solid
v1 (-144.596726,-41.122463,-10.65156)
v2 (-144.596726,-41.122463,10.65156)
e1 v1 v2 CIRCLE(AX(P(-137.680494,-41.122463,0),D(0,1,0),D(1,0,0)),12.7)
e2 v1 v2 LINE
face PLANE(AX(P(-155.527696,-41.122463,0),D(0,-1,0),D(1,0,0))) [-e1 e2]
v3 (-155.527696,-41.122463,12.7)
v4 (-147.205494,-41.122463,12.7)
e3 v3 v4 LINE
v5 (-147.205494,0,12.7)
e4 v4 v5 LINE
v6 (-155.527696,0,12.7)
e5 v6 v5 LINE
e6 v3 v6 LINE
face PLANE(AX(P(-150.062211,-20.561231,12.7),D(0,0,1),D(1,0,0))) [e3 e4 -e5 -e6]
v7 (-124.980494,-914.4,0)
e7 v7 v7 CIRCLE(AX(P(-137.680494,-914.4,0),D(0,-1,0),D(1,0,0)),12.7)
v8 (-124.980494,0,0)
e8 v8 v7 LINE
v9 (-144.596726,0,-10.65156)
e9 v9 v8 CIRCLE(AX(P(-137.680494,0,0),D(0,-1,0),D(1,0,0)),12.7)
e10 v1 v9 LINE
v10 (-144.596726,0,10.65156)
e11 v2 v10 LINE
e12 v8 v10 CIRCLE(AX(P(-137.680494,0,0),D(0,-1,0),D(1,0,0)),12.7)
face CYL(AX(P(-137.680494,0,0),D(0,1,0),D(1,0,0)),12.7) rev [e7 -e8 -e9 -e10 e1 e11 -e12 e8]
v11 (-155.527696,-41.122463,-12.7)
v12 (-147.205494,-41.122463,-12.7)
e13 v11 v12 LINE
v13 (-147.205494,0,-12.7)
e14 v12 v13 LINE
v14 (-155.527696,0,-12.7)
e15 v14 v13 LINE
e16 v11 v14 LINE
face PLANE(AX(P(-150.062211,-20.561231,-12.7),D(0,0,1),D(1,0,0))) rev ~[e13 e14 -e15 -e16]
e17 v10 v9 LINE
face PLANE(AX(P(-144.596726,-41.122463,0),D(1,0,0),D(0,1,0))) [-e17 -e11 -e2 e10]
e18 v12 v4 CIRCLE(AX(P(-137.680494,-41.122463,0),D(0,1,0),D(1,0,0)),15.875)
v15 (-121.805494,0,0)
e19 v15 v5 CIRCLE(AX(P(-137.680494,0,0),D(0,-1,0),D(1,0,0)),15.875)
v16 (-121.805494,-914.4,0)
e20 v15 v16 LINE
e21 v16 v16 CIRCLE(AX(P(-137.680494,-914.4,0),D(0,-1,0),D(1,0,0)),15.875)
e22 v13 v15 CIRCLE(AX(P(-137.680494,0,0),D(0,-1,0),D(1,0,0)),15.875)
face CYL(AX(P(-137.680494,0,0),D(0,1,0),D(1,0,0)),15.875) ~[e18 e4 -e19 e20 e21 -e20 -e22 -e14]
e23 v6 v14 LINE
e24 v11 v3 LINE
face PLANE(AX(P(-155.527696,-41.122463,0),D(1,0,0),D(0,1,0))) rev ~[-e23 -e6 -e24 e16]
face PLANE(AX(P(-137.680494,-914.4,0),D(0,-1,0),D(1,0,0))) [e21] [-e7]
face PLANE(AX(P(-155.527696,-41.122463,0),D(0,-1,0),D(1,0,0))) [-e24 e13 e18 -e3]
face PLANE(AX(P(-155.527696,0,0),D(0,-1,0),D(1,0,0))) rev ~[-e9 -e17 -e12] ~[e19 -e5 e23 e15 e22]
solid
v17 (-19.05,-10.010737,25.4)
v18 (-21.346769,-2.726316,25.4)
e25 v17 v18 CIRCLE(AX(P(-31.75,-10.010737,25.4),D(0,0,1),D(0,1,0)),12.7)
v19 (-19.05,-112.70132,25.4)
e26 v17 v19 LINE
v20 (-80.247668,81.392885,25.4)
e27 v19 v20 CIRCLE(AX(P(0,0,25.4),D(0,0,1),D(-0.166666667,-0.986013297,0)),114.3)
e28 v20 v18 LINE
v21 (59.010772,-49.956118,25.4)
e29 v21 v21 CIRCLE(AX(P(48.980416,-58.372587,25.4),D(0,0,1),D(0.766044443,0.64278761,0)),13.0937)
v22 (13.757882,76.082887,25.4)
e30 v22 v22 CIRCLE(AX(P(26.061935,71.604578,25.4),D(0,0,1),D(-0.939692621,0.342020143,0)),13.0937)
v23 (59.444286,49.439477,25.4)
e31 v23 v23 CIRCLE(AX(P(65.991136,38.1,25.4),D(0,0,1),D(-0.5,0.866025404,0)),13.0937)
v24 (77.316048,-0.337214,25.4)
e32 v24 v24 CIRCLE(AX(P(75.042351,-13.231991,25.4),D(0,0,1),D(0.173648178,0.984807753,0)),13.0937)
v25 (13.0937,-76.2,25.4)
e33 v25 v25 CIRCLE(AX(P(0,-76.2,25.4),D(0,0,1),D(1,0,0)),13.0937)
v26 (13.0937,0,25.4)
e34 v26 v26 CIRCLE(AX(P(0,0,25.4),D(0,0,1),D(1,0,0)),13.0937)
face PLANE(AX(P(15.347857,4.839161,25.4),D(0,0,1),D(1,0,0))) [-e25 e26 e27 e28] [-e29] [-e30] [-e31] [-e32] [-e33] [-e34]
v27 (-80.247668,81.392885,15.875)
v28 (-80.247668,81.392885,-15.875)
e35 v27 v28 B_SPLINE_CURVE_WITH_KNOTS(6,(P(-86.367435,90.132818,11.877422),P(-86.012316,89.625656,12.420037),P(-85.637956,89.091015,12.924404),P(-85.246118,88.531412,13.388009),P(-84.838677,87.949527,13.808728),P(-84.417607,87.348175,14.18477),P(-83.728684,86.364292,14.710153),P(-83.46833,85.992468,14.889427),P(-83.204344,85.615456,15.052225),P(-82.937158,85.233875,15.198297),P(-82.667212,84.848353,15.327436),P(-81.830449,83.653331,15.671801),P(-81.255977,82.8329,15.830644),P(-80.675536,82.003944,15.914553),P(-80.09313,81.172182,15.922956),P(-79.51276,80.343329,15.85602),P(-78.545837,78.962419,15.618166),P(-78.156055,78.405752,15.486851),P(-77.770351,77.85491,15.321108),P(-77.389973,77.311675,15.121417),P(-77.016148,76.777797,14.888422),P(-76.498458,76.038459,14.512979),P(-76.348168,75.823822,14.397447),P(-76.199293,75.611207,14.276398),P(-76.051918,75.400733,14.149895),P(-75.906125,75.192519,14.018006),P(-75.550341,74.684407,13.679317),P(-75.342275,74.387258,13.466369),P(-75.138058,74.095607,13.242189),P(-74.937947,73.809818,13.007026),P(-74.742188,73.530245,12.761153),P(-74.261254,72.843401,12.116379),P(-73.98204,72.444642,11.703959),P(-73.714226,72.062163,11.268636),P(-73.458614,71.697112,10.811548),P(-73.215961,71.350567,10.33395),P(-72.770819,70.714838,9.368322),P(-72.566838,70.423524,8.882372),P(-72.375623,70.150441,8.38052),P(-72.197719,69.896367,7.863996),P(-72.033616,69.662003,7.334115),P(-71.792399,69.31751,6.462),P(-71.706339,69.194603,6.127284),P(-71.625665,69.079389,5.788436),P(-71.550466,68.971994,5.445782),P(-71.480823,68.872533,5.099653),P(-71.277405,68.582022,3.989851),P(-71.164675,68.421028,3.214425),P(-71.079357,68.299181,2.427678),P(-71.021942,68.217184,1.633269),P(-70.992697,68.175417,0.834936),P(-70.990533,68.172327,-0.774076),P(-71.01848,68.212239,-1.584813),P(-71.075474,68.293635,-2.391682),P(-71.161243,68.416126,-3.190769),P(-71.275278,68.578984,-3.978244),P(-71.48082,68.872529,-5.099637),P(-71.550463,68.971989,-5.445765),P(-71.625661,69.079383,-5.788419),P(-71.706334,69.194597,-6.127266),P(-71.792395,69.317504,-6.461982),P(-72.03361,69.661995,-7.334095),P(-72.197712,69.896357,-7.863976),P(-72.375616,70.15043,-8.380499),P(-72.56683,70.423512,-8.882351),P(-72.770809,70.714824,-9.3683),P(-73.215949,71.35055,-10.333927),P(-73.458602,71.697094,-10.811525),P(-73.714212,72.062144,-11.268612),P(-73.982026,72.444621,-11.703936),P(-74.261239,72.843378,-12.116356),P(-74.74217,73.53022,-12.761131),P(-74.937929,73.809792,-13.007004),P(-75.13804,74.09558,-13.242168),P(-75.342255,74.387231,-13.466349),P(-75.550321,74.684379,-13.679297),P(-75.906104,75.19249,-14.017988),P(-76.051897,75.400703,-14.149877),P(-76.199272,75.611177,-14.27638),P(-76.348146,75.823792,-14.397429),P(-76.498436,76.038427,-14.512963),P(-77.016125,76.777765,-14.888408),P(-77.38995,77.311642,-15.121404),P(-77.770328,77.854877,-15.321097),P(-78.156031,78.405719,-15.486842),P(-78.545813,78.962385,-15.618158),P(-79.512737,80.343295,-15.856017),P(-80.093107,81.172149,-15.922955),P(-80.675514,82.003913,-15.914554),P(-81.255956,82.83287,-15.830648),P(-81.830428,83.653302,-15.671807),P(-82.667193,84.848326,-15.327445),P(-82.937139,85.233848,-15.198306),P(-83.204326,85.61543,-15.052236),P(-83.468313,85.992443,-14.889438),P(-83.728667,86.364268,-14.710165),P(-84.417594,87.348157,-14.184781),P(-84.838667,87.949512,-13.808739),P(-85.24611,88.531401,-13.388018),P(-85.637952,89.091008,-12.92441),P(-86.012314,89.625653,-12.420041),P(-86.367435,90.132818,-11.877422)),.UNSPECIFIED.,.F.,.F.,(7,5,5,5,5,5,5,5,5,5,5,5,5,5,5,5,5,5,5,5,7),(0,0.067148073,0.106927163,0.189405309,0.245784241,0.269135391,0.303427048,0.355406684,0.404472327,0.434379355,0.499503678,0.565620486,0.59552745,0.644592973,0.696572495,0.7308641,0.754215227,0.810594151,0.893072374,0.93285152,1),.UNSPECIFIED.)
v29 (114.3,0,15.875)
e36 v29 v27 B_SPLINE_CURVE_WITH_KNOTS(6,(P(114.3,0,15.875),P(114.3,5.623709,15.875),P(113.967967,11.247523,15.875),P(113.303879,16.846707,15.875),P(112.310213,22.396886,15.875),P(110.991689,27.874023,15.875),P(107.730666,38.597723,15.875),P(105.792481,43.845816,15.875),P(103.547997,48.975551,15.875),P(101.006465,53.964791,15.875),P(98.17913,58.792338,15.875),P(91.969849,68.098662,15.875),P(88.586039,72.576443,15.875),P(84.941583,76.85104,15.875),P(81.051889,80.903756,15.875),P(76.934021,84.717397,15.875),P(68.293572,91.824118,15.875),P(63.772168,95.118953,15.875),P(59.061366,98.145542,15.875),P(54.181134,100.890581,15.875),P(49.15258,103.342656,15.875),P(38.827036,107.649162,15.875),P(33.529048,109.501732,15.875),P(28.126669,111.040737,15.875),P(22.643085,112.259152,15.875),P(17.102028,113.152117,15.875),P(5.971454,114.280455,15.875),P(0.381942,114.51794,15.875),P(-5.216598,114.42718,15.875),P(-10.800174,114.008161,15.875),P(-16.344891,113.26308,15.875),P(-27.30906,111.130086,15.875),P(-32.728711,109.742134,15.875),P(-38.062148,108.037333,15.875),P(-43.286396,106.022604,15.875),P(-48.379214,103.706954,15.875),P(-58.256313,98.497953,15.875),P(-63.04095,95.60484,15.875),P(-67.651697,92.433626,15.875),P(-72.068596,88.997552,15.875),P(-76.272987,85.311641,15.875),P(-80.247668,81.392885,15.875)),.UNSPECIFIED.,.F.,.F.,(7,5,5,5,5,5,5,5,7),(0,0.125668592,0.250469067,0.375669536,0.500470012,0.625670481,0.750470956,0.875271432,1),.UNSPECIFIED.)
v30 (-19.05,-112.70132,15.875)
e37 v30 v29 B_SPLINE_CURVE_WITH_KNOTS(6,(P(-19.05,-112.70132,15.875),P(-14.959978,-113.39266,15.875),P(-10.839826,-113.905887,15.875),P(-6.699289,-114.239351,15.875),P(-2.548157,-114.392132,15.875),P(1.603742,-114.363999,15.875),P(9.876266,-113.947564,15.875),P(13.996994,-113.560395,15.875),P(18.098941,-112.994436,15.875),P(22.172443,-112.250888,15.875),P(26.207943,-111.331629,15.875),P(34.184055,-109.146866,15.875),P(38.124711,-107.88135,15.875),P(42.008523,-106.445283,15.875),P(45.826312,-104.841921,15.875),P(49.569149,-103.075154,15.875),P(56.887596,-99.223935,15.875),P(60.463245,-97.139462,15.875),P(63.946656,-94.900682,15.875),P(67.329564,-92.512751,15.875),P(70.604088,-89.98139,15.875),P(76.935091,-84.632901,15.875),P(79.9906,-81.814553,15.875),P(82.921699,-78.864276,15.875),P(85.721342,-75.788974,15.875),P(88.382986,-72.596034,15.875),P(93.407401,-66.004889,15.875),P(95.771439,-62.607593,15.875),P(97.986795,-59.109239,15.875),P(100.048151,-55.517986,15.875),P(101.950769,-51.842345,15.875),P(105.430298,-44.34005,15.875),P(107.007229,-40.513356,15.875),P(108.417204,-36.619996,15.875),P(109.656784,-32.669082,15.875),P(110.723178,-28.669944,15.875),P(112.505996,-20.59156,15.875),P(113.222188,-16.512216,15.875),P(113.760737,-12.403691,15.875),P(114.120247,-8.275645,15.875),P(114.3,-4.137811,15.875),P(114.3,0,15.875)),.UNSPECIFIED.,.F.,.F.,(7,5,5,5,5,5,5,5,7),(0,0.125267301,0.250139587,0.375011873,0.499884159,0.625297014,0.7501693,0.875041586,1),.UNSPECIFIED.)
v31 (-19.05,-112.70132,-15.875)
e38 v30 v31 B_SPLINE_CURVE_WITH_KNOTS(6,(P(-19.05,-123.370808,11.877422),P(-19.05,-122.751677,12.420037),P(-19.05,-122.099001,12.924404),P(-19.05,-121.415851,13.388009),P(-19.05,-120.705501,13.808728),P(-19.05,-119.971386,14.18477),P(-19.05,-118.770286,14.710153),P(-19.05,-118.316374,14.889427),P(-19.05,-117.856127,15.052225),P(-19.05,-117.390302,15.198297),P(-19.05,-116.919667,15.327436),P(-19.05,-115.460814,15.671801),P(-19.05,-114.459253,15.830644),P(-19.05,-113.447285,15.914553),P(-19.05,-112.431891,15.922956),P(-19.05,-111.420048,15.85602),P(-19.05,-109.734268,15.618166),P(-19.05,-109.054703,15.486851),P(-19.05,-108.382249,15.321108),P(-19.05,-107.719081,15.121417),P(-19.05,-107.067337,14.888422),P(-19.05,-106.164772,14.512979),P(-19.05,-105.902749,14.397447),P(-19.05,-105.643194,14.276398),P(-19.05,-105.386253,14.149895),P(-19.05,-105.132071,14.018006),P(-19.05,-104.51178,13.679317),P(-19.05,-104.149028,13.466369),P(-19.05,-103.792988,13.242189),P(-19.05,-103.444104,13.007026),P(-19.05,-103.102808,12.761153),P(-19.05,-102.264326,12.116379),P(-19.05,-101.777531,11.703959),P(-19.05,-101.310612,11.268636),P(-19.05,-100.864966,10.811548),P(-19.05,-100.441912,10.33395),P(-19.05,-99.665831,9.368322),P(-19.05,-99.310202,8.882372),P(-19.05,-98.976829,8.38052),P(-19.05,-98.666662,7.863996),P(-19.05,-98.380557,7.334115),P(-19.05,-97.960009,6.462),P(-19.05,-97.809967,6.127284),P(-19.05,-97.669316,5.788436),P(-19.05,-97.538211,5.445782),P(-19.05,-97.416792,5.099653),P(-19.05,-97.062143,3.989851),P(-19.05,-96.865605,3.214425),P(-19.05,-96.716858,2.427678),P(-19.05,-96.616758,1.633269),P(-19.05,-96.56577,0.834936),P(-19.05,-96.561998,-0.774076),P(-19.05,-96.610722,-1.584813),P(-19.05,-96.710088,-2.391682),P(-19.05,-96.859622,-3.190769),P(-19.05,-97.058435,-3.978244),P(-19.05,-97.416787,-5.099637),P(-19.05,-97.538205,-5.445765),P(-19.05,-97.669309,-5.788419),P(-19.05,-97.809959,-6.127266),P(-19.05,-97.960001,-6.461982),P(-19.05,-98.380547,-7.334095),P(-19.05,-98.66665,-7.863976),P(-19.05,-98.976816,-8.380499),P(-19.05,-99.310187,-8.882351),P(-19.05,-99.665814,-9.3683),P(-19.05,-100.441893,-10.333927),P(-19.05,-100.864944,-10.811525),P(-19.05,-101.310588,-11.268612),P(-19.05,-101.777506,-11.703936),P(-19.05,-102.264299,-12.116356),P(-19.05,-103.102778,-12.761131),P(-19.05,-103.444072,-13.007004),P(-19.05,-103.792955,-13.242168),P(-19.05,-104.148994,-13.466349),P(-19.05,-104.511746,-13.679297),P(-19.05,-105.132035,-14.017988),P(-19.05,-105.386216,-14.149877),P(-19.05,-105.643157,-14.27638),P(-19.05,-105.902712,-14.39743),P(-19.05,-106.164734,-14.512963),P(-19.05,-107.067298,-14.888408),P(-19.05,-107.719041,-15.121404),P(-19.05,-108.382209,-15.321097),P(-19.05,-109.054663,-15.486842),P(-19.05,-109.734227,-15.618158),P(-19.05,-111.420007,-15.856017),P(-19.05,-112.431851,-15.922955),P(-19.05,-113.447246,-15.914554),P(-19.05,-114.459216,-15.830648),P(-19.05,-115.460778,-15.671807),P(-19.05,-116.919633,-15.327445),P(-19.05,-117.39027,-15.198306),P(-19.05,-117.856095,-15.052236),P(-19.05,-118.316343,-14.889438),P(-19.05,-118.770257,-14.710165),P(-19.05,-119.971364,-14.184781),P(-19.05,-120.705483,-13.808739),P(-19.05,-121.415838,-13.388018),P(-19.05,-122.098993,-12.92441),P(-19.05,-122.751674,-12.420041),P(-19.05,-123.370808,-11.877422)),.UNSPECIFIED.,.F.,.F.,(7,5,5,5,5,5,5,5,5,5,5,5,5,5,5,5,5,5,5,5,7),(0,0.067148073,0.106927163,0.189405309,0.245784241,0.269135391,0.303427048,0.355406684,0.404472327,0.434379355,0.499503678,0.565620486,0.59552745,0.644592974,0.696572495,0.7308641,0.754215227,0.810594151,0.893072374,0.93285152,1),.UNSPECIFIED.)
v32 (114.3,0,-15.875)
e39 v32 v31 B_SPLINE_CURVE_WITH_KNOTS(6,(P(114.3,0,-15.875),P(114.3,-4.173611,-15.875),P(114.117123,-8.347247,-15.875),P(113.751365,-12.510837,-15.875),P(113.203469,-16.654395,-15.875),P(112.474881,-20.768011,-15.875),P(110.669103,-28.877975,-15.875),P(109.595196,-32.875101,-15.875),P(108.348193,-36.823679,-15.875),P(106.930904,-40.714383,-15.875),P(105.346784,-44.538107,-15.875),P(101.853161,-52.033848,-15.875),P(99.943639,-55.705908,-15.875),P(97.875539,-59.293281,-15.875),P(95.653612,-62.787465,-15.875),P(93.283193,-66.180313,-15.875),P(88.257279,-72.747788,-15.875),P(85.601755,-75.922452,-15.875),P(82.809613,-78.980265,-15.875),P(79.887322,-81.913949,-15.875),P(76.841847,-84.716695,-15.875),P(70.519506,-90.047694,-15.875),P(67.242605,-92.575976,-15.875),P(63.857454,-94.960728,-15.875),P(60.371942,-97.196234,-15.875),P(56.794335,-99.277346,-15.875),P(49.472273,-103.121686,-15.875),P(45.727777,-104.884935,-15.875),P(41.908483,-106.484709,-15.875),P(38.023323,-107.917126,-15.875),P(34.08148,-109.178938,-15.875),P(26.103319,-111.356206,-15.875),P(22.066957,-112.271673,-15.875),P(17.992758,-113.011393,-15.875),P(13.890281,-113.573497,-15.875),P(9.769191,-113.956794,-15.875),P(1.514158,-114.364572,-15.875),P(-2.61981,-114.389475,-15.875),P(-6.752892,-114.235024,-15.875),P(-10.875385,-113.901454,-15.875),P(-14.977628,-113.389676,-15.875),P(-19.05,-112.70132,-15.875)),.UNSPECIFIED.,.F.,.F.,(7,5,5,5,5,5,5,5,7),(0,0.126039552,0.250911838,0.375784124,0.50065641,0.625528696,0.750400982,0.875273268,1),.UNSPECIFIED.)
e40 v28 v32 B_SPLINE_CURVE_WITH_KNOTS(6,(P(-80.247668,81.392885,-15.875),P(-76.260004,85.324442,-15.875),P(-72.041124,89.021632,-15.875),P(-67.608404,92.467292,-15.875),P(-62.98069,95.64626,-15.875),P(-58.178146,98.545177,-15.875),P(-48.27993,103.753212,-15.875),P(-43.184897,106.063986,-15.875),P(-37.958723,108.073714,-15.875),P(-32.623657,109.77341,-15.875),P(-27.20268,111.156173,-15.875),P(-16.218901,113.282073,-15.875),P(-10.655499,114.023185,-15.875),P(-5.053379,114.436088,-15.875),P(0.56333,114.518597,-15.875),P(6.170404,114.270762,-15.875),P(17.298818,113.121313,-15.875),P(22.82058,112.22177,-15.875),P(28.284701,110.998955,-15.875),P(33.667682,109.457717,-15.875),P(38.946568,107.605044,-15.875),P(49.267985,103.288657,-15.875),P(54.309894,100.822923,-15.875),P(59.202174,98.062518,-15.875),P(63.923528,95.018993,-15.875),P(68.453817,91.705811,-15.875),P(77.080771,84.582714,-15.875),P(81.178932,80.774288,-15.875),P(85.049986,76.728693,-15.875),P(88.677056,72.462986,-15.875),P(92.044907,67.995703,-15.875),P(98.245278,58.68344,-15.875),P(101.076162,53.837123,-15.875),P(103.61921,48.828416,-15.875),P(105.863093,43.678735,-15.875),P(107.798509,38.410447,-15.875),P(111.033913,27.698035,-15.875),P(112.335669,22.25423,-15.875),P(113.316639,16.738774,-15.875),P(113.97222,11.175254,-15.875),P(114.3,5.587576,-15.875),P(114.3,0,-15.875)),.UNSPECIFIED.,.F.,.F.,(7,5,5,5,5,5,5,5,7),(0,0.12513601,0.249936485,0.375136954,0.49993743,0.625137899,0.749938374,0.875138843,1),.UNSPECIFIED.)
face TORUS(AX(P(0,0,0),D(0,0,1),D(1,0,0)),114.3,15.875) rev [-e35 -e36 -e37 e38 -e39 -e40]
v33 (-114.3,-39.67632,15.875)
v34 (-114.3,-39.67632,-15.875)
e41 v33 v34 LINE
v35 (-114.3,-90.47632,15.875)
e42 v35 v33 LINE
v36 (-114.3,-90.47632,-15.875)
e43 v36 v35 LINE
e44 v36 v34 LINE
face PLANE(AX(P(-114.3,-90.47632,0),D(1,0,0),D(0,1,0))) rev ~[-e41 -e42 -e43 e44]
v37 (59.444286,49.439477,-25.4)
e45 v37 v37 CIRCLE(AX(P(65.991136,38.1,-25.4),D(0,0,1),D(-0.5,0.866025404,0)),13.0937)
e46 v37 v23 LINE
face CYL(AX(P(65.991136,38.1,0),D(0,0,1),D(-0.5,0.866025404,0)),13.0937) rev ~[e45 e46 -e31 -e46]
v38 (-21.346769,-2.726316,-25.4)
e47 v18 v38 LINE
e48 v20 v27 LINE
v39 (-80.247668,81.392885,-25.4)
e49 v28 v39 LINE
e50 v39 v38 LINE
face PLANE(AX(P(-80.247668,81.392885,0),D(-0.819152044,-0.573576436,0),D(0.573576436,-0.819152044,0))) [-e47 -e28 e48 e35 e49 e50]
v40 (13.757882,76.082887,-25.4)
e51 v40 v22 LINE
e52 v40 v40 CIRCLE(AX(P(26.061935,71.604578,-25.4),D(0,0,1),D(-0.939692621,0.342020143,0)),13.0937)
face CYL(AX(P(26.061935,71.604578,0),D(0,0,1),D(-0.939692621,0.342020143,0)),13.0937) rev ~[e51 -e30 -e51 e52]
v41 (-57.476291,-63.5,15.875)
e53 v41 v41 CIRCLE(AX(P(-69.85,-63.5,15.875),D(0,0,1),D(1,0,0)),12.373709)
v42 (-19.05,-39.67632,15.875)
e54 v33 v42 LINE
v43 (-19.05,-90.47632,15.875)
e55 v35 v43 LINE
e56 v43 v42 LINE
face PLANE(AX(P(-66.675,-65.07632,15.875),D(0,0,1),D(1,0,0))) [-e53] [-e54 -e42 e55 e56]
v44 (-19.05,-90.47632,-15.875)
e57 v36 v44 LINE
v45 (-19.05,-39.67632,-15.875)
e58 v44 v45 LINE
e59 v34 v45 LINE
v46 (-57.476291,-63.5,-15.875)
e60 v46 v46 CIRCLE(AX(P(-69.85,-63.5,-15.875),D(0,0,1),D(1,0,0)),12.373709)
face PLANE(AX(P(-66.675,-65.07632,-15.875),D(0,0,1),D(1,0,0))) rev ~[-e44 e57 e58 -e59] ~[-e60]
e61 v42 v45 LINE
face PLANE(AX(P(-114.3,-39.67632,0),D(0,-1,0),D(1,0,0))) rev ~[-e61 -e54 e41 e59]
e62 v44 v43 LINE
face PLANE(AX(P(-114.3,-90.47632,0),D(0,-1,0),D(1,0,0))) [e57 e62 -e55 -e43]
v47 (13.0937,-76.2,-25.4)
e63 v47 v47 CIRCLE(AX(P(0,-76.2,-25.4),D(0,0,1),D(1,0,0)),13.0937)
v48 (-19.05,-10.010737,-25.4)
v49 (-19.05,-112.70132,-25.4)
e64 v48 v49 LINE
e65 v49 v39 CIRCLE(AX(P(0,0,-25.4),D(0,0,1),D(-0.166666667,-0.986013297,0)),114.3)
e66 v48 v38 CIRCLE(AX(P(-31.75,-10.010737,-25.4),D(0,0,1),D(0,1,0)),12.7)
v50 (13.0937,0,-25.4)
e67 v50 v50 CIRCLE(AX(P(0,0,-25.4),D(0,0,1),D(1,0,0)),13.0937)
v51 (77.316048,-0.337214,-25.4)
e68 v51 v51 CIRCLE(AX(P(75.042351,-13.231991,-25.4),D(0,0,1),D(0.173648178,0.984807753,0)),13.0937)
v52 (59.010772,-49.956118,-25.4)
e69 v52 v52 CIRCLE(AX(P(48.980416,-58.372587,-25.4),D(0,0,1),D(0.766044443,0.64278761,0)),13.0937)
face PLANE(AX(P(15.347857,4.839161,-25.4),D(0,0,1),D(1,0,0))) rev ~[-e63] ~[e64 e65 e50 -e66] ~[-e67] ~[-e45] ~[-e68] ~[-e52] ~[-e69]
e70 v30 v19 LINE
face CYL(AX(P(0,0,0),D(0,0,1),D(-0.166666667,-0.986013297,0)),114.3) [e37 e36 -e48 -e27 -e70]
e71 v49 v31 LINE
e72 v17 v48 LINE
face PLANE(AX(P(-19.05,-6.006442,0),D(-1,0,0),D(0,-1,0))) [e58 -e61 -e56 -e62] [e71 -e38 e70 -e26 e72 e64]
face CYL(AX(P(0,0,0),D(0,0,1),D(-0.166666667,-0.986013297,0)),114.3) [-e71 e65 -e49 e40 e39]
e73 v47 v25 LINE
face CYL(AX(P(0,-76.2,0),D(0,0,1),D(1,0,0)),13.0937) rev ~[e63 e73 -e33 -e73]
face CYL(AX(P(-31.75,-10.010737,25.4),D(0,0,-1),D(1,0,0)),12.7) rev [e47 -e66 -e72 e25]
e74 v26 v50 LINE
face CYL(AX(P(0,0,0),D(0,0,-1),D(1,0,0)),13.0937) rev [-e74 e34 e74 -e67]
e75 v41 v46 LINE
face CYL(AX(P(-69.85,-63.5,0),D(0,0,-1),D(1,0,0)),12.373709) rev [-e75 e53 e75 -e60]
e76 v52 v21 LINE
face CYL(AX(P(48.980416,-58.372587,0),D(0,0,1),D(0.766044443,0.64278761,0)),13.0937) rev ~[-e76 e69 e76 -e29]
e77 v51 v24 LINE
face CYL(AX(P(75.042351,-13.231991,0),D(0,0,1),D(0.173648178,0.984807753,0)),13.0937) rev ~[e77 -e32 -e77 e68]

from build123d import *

# Parameters (mm, degrees)
F0_R            = 13.0937
F1_DEPTH        = 25.4
F3_R            = 13.0937
F4_DEPTH        = 63.5
F4_COPIES_COUNT = 5
F4_COPIES_ANGLE = 160
F5_R            = 15.875
F7_W            = 95.25
F7_H            = 50.8
F7_R            = 12.3737085095
F8_DEPTH        = 15.875
F9_R            = 12.7
F10_R           = 15.875
F10_R_2         = 12.7
F11_DEPTH       = 914.4
F12_W           = 10.9309703112
F12_H           = 41.1224626005
F13_DEPTH       = 12.7


# Not quite as in the source:
# - a pattern or mirror of a feature is missing from the dataset's text; its kind, count and spacing are read off the source's solid


with BuildPart() as f1:
    # F0 (on Top) → F1 (new body, symmetric)
    with BuildSketch(Plane.XY):
        with BuildLine():
            Line((-19.05, -6.0064419281), (-19.05, -112.701319868))
            ThreePointArc((-19.05, -112.701319868), (109.0098474705, 34.3706728833), (-80.2476678657, 81.3928854515))
            Line((-80.2476678657, 81.3928854515), (-19.05, -6.0064419281))
        make_face()
        Circle(F0_R, mode=Mode.SUBTRACT)
    extrude(amount=F1_DEPTH, both=True)

    # F3 (on Top) → F4 (cut, symmetric)
    with BuildSketch(Plane.XY):
        with Locations((0, -76.2)):
            Circle(F3_R)
    f4 = extrude(amount=F4_DEPTH, both=True, mode=Mode.SUBTRACT)

    # F4_copies: F4 ×5 about axis
    f4_copies_axis = Axis((0, 0, 0), (0, 0, 1))
    for i in range(1, F4_COPIES_COUNT):
        add(f4.rotate(f4_copies_axis, i * F4_COPIES_ANGLE / (F4_COPIES_COUNT - 1)), mode=Mode.SUBTRACT)

    # F5 (on Front) → F6 (revolve, cut)
    with BuildSketch(Plane.XZ):
        with Locations((114.3, 0)):
            Circle(F5_R)
    revolve(axis=Axis((0, 0, 0), (0, 0, -1)), mode=Mode.SUBTRACT)

    # F7 (on Top) → F8 (join, symmetric)
    with BuildSketch(Plane.XY):
        with Locations((-66.675, -65.076319868)):
            Rectangle(F7_W, F7_H)
        with Locations((-69.85, -63.5)):
            Circle(F7_R, mode=Mode.SUBTRACT)
    extrude(amount=F8_DEPTH, both=True)

    # F9
    f9_edges = [f1.edges().sort_by_distance(p)[0] for p in [
        (-19.05, -6.006442, 0),
    ]]
    fillet(f9_edges, radius=F9_R)


with BuildPart() as f11:
    # F10 (on Front) → F11 (new body)
    with BuildSketch(Plane.XZ):
        with Locations((-137.6804935392, 0)):
            Circle(F10_R)
        with Locations((-137.6804935392, 0)):
            Circle(F10_R_2, mode=Mode.SUBTRACT)
    extrude(amount=F11_DEPTH)

    # F12 (on Top) → F13 (join, symmetric)
    with BuildSketch(Plane.XY):
        with Locations((-150.0622108579, -20.5612313002)):
            Rectangle(F12_W, F12_H)
    extrude(amount=F13_DEPTH, both=True)


solid = Compound([f1.part, f11.part])
